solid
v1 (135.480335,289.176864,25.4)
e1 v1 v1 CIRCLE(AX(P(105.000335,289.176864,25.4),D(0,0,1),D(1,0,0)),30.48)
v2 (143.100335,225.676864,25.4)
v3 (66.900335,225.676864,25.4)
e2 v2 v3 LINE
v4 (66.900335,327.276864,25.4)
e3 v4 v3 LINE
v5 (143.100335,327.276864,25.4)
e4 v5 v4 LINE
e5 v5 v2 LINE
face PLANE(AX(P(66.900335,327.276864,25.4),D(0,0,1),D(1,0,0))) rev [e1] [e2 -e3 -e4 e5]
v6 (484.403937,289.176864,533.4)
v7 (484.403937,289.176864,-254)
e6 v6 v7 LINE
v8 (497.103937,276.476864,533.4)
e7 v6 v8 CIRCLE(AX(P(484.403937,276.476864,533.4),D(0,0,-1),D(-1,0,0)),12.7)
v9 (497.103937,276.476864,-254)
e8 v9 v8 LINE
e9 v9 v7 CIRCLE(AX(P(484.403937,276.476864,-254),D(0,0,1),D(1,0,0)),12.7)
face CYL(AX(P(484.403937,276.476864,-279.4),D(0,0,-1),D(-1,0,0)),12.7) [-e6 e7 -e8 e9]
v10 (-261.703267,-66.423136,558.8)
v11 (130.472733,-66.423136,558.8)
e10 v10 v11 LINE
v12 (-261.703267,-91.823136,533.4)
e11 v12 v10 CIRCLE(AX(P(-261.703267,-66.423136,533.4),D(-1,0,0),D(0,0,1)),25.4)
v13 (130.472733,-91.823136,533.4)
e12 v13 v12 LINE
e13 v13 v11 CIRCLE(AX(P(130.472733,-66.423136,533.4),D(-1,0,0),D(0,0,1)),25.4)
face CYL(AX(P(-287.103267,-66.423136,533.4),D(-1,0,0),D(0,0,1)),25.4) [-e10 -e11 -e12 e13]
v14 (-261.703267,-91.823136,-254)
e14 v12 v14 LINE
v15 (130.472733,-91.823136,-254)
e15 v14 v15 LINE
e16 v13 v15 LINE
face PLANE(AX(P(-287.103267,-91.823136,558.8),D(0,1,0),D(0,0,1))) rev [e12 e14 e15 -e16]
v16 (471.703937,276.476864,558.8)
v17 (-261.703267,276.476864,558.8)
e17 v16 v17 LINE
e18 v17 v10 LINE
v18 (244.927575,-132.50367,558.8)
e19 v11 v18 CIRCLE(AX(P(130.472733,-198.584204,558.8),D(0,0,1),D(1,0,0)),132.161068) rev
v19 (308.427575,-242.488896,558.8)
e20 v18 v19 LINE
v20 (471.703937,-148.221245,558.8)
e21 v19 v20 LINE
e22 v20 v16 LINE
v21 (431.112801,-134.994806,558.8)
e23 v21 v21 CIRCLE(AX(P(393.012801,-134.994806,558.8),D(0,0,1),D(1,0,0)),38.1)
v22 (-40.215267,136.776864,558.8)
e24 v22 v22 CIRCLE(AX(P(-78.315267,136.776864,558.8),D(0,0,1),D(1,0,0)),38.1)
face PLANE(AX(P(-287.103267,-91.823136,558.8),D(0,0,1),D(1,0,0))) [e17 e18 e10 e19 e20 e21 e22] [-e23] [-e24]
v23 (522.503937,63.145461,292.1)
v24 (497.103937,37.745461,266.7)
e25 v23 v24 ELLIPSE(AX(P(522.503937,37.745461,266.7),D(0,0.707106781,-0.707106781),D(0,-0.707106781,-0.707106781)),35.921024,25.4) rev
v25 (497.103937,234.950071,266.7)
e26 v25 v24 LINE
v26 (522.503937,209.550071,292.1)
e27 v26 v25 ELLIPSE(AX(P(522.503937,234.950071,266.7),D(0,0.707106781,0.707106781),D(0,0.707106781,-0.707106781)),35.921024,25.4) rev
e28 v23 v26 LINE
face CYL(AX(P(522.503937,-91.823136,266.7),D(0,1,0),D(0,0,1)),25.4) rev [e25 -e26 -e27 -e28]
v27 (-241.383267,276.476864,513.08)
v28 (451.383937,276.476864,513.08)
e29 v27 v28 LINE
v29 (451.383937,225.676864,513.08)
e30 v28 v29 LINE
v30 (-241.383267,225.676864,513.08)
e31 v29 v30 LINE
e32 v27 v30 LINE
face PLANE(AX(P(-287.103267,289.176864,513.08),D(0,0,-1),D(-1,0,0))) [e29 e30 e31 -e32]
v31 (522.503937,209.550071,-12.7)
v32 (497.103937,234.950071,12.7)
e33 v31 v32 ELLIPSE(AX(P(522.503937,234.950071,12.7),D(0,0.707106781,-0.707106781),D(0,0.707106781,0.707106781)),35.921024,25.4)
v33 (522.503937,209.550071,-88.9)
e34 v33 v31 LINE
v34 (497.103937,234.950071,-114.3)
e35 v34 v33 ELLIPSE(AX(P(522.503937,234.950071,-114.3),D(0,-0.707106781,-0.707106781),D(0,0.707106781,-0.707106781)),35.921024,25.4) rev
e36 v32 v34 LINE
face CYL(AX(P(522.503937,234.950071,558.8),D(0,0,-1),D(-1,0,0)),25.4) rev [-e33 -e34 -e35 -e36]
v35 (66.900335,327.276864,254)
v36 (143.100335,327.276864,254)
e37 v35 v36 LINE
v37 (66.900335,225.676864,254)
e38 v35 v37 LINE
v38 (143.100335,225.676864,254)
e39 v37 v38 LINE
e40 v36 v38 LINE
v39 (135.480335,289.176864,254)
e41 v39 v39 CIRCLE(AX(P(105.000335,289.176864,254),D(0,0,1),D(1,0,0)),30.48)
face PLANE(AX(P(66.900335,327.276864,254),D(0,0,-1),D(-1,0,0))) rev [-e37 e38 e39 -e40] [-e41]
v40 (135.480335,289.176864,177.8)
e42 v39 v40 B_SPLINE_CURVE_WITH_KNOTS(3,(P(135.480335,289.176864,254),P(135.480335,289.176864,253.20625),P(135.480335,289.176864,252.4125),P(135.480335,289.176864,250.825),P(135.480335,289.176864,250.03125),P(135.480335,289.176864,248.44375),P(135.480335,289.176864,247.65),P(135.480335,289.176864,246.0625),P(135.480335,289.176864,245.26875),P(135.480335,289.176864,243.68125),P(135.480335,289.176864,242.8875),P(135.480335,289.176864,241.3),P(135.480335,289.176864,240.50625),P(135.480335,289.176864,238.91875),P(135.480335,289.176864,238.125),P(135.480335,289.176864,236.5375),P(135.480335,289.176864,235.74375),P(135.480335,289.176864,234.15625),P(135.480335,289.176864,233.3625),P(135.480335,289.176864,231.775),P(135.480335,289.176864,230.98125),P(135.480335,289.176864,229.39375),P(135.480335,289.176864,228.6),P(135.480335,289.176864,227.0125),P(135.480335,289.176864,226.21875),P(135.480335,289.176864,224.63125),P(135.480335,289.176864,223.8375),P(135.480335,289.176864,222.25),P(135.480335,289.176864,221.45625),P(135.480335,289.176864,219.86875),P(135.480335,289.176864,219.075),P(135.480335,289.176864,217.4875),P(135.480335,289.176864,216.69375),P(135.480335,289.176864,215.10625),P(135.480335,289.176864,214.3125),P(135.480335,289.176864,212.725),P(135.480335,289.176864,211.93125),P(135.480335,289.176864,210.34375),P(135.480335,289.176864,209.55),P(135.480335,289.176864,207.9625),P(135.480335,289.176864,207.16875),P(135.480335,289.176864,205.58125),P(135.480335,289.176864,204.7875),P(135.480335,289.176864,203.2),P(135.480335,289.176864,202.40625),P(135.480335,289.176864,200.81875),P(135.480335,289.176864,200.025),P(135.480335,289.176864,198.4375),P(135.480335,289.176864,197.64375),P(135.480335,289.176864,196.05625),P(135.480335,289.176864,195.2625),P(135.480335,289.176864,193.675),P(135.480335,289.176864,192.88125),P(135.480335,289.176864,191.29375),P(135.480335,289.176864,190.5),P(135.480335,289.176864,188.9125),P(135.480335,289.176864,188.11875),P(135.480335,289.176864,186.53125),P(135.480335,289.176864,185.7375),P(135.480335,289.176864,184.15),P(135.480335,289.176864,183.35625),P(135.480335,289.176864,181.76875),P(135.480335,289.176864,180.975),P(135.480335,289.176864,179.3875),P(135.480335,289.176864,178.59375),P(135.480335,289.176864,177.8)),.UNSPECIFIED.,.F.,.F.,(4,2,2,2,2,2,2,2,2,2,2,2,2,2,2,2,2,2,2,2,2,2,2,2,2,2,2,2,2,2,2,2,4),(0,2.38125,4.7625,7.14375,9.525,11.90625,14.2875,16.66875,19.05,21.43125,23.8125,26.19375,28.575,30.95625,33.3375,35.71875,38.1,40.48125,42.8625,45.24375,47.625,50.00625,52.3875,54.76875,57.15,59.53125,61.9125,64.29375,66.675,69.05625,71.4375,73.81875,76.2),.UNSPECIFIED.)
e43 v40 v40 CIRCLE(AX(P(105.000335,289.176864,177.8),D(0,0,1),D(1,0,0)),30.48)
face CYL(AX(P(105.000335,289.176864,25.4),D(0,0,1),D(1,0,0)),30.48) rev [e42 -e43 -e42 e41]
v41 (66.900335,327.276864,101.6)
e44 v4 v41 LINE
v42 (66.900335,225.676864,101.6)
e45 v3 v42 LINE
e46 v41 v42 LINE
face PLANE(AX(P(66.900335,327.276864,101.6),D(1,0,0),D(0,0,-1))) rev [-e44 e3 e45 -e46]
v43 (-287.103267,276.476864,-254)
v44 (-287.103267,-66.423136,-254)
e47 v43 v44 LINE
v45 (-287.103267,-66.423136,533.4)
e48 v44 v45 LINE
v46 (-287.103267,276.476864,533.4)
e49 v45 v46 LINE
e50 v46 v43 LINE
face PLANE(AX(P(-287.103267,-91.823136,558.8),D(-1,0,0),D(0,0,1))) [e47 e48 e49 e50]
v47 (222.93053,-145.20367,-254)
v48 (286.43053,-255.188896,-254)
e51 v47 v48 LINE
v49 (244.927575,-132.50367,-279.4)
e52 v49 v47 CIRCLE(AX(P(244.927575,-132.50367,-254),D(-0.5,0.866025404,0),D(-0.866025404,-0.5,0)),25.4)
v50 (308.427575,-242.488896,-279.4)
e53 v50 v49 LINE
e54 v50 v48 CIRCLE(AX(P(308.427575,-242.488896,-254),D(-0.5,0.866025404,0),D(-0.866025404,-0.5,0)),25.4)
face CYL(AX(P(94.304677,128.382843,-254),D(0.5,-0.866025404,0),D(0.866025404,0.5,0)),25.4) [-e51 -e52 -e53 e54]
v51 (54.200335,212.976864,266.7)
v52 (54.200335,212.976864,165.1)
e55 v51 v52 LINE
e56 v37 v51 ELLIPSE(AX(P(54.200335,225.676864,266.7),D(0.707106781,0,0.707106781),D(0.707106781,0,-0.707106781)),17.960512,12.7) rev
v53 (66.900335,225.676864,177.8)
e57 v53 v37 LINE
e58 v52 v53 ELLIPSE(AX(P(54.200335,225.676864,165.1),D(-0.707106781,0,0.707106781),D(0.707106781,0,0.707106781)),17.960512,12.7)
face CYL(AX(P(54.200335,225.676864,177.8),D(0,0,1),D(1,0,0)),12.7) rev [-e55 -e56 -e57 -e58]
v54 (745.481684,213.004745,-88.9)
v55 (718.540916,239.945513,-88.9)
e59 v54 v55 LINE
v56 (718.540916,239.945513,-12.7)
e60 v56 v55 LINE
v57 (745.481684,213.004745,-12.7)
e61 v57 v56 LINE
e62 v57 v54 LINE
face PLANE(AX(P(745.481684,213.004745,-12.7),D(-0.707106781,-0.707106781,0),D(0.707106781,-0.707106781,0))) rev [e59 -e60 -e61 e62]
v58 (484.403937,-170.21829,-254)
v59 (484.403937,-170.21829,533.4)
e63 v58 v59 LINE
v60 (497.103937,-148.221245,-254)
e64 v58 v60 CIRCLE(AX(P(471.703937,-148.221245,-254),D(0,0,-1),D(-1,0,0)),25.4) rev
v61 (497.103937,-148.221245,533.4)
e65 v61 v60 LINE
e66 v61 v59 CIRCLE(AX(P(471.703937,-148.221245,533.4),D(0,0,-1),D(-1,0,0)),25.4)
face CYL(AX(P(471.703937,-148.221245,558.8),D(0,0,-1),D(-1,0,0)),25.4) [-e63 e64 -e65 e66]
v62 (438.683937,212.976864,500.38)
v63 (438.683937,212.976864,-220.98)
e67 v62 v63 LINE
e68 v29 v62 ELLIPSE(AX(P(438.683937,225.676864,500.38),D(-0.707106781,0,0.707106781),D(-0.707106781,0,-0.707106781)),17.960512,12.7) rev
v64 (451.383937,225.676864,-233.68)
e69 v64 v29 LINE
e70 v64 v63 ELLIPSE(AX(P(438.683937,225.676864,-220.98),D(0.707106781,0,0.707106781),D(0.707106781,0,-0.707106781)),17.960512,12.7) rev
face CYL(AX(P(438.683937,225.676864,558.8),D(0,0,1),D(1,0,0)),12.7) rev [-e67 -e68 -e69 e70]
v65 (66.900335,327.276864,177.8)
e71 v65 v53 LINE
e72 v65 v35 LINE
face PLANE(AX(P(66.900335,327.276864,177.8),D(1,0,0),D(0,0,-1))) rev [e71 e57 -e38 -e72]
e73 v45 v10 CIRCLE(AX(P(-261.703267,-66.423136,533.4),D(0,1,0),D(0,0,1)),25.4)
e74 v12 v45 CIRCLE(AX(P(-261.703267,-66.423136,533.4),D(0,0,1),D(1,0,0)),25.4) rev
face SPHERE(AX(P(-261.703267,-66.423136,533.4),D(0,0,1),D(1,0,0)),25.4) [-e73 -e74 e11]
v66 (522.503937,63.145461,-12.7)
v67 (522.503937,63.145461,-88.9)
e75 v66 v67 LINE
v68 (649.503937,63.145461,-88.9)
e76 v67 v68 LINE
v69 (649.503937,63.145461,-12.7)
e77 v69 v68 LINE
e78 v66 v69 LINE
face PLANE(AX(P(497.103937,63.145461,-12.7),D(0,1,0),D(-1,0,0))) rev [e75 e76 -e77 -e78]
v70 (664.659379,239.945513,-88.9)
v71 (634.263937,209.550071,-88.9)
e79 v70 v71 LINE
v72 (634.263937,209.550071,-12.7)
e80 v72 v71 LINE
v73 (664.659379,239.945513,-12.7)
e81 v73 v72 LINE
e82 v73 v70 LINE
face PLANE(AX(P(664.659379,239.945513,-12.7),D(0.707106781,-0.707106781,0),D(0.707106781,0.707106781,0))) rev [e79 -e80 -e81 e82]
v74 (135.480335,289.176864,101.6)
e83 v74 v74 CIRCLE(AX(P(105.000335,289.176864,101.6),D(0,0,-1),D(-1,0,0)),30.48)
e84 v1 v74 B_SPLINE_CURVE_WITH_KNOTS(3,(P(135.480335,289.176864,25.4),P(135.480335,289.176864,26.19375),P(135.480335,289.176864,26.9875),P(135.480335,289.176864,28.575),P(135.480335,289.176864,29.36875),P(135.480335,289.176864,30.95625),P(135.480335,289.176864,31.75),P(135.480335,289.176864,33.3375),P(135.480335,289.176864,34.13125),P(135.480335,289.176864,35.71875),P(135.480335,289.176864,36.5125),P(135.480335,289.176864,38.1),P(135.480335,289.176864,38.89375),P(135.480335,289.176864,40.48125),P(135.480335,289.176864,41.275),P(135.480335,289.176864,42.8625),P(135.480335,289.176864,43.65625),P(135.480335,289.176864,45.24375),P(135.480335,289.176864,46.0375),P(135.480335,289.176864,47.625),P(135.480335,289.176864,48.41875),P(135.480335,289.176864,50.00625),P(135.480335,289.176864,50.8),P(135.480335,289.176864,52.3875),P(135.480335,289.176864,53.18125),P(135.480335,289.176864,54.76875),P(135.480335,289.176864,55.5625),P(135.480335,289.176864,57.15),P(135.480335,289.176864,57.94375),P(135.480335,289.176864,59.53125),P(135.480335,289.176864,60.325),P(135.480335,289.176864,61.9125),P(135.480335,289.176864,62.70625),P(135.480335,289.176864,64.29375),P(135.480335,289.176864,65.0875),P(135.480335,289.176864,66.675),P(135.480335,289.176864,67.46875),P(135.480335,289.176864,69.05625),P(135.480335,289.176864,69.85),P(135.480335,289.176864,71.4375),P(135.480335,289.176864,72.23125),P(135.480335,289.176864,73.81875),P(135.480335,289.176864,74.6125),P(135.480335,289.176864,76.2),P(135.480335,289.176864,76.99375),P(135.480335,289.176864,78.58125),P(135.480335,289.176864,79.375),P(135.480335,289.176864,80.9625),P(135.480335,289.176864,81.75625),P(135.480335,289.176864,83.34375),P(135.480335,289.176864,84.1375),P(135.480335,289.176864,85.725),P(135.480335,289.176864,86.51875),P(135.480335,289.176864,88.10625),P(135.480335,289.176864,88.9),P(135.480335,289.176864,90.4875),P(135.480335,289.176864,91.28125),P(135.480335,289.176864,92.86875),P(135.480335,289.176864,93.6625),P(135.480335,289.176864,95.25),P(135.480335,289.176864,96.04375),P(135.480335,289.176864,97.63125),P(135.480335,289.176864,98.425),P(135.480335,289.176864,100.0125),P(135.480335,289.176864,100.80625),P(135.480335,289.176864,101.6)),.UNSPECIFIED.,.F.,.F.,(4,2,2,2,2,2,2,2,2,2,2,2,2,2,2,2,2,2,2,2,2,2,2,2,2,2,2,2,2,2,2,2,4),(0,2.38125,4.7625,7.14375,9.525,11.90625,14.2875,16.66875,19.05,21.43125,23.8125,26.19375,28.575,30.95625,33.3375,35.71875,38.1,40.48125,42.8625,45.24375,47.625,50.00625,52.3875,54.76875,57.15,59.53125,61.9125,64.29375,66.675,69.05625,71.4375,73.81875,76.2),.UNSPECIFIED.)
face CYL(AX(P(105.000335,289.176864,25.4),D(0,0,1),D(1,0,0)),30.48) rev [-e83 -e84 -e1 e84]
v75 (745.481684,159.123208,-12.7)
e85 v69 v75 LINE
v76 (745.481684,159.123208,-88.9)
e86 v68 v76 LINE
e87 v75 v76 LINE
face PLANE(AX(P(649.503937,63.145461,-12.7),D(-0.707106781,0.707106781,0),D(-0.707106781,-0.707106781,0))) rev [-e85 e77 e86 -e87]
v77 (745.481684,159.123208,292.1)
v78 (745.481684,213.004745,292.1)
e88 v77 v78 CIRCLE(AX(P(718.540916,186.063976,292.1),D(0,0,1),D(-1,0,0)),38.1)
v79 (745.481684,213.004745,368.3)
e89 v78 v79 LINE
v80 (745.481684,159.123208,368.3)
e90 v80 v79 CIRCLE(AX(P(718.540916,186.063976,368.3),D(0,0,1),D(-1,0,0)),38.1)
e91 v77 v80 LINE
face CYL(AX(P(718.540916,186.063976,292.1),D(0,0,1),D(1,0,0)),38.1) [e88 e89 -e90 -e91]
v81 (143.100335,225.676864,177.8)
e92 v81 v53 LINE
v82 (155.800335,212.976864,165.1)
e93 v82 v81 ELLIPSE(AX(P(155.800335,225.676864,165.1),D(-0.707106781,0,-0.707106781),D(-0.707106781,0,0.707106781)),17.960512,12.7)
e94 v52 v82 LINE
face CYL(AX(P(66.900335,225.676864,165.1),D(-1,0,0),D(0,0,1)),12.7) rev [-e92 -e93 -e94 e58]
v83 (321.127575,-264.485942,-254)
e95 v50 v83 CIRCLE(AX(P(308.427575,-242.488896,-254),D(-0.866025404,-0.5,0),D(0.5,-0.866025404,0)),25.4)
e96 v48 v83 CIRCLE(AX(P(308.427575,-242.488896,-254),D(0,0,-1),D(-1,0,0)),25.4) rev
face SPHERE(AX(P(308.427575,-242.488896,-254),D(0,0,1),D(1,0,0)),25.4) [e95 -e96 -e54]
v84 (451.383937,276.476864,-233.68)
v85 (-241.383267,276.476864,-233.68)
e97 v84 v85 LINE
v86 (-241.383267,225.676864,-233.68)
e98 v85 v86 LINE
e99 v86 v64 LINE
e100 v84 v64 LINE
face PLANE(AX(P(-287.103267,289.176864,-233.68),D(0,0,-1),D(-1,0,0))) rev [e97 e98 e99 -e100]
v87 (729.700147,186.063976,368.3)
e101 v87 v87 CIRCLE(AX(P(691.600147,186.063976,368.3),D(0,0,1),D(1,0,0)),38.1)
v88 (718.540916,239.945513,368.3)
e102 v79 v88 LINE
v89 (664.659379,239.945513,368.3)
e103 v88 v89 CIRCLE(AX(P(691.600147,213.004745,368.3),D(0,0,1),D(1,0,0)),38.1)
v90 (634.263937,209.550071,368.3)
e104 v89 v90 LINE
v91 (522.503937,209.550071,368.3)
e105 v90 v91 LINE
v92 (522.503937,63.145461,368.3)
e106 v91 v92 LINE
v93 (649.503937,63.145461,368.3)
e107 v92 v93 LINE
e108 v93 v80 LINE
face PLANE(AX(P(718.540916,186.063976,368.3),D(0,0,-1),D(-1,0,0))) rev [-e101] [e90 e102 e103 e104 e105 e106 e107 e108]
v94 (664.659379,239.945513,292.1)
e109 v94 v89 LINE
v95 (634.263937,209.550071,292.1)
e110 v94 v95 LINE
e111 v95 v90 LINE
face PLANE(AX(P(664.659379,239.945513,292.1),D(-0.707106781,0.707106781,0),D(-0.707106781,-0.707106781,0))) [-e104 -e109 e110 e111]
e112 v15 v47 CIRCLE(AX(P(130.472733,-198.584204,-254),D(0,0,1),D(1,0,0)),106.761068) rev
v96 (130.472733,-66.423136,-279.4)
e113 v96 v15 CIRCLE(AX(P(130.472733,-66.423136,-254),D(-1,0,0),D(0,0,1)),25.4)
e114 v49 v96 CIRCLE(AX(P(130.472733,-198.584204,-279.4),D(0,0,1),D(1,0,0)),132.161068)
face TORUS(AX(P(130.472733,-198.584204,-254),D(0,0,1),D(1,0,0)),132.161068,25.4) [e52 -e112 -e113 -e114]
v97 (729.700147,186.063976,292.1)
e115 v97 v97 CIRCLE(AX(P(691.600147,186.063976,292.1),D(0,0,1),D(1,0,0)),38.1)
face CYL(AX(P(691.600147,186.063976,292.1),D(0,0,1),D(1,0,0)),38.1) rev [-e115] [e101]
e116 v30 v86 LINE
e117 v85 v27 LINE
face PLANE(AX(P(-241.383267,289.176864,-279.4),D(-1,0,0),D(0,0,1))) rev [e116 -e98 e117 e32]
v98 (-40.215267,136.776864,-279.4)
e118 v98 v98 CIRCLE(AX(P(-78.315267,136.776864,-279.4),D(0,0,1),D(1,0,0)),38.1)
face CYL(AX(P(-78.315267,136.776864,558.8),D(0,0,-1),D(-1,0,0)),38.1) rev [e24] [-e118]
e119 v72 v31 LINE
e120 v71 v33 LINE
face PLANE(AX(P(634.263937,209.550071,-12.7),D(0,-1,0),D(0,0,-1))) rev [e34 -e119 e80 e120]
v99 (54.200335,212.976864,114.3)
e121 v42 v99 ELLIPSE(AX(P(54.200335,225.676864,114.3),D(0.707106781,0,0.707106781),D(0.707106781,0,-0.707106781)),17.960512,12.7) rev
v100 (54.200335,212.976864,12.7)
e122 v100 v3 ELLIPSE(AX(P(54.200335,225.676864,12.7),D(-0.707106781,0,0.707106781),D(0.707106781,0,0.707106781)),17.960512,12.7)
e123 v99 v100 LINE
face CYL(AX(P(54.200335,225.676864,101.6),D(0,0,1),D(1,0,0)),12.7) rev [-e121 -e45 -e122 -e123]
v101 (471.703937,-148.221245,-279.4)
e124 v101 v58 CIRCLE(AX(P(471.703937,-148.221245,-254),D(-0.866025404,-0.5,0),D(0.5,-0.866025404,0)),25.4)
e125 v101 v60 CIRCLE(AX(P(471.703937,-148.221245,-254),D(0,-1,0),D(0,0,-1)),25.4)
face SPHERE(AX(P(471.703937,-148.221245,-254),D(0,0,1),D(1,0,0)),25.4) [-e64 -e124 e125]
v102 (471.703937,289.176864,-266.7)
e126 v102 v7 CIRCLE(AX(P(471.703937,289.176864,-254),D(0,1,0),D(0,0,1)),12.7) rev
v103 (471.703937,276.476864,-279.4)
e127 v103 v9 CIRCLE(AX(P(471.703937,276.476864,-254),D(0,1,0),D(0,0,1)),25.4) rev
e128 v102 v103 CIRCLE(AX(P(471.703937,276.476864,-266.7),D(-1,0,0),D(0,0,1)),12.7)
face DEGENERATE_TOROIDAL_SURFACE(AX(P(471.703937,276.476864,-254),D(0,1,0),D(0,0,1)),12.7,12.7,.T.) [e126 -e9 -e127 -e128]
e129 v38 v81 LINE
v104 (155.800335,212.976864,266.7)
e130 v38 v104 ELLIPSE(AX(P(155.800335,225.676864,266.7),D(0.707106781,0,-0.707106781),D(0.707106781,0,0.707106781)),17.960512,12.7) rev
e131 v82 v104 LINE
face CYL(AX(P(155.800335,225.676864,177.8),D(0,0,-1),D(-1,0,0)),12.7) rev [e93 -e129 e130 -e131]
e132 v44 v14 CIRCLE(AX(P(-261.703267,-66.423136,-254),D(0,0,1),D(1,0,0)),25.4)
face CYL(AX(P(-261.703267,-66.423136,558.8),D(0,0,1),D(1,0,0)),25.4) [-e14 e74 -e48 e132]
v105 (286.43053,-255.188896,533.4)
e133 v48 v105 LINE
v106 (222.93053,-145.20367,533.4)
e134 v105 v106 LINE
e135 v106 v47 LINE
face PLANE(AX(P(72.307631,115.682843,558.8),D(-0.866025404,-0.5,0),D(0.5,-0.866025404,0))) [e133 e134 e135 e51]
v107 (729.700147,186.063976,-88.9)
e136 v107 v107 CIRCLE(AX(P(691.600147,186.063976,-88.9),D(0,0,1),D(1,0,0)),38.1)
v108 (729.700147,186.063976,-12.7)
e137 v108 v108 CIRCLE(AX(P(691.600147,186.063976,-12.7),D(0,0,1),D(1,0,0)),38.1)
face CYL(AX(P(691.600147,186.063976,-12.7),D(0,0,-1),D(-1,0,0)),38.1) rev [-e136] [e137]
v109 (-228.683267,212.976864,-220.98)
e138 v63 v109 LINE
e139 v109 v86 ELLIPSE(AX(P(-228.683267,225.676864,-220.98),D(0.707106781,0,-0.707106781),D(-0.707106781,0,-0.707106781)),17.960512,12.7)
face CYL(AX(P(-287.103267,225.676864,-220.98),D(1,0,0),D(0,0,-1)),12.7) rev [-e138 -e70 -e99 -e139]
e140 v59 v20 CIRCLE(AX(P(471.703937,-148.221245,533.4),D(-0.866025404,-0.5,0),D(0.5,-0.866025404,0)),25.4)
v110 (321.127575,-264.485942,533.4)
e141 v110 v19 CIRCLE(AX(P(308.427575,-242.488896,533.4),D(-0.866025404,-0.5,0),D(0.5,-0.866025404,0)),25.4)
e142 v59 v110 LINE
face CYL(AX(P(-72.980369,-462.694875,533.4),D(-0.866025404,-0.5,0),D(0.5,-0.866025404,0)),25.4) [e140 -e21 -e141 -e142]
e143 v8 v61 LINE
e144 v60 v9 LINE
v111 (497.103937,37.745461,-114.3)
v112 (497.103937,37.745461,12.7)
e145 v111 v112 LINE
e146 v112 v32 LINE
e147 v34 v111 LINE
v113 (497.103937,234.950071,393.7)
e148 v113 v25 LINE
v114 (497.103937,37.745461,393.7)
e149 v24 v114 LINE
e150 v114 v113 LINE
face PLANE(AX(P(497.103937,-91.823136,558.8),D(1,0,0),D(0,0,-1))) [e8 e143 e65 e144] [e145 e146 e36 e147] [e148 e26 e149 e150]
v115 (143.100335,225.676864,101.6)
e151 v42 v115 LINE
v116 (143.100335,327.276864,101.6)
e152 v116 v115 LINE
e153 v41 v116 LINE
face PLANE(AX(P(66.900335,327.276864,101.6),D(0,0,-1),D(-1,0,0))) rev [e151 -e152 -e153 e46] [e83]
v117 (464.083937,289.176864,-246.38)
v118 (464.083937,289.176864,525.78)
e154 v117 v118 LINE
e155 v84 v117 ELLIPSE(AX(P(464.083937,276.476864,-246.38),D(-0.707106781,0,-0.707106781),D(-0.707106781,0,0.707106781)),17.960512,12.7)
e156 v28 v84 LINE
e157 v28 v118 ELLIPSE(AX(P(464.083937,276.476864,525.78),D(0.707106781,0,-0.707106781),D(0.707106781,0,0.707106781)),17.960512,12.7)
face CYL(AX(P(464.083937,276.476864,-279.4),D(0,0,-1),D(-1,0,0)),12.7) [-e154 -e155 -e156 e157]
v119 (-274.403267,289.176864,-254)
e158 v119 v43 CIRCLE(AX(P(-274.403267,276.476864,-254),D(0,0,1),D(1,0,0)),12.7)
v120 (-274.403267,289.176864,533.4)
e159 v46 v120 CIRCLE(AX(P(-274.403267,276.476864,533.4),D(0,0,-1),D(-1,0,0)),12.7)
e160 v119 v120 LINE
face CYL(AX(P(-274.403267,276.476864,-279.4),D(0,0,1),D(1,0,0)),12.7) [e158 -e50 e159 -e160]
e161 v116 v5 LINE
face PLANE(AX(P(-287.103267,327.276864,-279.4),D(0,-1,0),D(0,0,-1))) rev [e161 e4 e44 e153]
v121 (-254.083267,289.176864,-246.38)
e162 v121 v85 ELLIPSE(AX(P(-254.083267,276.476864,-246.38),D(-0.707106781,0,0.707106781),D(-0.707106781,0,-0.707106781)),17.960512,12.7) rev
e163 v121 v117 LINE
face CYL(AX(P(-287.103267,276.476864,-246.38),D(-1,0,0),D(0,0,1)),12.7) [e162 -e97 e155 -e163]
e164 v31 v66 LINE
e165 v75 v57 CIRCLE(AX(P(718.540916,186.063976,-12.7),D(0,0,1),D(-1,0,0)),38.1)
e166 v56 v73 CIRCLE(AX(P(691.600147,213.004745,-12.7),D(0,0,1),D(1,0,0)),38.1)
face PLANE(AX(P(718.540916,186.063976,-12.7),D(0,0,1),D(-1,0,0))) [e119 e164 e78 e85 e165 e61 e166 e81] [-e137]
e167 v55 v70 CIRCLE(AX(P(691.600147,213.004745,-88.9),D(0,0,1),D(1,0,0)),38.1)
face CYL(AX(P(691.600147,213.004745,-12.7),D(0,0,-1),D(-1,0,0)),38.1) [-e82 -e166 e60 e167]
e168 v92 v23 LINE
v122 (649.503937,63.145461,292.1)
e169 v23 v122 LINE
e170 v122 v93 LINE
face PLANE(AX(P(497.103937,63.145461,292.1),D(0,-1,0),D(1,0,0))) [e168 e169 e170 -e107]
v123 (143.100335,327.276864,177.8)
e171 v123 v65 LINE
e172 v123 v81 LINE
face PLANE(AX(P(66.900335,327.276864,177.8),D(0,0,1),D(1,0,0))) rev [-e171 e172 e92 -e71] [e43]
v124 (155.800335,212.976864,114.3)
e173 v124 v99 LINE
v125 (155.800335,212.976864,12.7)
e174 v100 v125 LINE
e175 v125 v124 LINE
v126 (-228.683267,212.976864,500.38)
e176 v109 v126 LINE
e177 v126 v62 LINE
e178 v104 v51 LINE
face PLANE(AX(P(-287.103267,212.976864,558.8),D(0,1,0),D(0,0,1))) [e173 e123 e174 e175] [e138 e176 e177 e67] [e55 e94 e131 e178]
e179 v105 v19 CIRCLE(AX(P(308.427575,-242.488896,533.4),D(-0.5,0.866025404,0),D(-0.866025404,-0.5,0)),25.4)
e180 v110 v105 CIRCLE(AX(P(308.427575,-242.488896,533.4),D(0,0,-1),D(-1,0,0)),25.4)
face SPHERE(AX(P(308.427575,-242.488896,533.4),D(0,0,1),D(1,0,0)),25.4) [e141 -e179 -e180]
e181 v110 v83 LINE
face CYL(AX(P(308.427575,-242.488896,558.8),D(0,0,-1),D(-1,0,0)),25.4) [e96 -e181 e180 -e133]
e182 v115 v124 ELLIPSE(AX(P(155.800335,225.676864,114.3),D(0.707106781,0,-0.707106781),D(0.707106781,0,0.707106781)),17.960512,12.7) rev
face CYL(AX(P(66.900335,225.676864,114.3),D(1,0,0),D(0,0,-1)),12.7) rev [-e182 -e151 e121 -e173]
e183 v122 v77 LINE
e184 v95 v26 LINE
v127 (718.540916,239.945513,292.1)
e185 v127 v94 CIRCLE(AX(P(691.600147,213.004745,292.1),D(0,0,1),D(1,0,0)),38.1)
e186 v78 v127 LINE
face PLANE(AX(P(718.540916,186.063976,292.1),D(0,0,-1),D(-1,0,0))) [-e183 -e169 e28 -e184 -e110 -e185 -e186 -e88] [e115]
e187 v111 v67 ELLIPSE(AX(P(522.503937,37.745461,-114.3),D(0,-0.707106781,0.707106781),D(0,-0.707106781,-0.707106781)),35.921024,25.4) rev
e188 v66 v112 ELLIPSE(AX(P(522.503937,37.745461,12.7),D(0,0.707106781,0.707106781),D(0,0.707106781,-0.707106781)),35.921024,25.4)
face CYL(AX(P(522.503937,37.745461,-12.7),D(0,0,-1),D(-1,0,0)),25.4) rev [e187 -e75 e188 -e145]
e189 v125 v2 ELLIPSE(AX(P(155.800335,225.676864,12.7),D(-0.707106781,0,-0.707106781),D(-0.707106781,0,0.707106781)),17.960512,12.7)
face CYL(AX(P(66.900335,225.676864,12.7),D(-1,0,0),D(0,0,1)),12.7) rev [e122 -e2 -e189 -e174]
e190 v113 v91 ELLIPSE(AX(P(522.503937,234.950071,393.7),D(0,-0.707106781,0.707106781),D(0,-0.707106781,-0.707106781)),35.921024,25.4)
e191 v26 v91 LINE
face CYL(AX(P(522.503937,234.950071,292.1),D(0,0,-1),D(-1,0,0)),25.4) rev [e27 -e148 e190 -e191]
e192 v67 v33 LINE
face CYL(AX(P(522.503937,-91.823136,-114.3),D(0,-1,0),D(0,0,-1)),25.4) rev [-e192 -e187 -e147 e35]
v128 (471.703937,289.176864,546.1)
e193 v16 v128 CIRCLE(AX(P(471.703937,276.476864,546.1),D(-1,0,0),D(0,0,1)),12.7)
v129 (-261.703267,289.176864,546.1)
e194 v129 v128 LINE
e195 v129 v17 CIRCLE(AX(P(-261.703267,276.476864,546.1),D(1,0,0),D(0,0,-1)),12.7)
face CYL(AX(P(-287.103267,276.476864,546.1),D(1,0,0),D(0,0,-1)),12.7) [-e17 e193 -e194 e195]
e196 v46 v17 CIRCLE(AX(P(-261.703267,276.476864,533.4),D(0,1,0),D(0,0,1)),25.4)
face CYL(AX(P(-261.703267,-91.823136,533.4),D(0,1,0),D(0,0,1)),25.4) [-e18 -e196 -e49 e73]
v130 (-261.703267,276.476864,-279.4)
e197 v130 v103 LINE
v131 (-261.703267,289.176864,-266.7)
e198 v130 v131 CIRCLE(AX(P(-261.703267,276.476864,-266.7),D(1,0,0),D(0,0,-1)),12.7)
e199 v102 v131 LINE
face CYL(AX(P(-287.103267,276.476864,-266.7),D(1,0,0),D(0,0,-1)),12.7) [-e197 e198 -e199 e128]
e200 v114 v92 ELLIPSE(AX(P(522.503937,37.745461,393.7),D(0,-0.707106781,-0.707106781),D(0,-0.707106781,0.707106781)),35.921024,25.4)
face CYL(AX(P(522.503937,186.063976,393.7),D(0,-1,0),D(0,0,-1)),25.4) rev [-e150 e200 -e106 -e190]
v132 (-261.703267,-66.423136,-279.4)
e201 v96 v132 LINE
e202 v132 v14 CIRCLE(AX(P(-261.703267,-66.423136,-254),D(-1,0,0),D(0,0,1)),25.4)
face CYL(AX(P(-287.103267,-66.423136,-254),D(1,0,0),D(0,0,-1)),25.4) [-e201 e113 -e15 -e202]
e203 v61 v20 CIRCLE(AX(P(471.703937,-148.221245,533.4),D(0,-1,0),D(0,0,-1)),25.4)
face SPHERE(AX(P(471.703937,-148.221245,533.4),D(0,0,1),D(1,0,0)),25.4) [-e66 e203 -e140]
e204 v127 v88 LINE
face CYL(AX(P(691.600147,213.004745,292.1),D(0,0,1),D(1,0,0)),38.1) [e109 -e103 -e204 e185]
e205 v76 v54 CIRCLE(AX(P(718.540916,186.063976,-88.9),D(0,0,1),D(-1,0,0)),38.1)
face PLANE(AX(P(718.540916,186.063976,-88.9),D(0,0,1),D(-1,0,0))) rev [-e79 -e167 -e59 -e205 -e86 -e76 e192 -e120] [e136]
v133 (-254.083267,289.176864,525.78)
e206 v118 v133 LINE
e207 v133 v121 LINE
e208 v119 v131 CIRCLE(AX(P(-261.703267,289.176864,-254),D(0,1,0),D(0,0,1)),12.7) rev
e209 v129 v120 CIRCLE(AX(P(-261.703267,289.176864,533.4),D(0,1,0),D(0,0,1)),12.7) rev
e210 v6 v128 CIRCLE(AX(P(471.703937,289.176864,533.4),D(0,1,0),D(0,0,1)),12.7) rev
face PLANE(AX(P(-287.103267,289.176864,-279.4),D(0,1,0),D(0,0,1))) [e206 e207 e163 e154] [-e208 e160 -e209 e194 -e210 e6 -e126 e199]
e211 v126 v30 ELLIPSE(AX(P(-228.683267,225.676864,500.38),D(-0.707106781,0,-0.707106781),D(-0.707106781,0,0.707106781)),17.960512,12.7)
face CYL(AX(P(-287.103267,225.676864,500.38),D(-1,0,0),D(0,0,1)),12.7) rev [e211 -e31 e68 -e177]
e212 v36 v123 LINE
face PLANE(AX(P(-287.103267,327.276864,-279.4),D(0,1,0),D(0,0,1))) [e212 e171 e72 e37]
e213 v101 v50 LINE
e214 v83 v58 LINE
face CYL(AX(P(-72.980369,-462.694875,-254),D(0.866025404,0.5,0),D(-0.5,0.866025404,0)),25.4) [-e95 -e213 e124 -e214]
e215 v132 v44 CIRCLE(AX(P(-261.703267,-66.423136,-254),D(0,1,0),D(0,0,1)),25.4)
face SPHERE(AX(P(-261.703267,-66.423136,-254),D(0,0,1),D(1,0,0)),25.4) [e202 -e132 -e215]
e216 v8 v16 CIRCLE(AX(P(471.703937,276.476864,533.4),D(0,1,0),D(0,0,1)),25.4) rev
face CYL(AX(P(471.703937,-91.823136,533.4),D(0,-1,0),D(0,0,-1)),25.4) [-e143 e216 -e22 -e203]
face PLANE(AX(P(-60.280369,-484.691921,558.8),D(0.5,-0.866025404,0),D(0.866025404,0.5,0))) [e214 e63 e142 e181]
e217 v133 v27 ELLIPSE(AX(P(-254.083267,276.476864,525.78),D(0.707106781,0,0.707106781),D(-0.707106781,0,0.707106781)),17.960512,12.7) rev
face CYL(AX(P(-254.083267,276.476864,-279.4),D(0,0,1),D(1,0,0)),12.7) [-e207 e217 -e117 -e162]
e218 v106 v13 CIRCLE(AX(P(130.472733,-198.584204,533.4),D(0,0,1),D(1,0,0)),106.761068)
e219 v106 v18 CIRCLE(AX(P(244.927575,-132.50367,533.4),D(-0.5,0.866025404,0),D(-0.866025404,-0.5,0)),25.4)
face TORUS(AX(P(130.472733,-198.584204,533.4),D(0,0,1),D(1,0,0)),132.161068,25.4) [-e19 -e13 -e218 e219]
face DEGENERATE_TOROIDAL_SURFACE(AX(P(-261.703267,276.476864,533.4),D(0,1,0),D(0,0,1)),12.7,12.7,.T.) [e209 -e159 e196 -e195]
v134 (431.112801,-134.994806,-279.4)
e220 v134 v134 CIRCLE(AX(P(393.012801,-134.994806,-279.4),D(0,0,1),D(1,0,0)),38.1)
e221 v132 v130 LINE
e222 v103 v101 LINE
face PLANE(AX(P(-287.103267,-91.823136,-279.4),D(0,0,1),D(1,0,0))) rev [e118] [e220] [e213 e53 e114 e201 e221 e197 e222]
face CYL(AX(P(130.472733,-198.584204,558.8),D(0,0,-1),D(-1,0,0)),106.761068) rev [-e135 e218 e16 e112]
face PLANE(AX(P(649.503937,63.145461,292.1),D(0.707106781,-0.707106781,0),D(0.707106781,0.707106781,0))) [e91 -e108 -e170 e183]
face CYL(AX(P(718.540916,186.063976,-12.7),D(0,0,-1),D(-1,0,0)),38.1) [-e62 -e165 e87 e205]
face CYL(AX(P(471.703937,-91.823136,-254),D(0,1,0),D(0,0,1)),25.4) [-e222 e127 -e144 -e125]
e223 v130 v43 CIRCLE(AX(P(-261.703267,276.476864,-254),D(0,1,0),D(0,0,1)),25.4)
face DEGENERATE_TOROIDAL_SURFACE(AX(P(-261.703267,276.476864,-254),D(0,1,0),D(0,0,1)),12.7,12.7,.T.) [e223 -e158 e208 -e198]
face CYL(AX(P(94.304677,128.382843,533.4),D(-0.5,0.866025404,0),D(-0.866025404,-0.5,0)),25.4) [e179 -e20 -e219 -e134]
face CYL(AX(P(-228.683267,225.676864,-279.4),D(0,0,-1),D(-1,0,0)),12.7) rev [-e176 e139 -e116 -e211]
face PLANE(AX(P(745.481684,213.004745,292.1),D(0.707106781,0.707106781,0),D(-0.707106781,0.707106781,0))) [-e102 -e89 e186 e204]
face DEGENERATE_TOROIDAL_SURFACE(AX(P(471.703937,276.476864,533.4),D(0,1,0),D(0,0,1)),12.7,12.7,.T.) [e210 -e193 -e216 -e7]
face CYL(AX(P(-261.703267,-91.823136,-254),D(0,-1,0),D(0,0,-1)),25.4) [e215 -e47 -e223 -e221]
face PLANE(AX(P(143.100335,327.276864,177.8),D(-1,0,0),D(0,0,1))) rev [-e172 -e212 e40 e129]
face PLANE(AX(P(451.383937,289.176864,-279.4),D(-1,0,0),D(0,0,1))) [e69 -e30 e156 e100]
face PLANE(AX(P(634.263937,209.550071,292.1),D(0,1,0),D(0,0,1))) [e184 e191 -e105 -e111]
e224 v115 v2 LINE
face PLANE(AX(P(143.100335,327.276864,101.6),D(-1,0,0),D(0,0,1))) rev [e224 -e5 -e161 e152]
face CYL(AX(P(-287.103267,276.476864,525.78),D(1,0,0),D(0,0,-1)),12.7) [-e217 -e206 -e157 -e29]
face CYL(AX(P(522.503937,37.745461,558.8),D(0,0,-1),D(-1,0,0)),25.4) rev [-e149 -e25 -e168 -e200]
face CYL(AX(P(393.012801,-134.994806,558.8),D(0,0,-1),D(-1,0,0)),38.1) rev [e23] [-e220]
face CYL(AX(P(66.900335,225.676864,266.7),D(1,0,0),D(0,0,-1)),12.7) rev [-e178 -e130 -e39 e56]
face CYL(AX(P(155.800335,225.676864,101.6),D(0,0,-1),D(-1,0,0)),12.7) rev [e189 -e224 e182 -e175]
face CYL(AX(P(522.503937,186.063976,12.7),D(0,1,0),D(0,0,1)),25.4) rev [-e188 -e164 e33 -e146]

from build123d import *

# Parameters (mm, degrees)
SKETCH2_W           = 139.192
SKETCH2_H           = 101.6
SKETCH2_R           = 12.7
BOSS_EXTRUDE1_DEPTH = 279.4
SKETCH4_W           = 261.402401422
SKETCH4_H           = 279.4
SKETCH4_W_2         = 230.922401422
SKETCH4_H_2         = 248.92
BOSS_EXTRUDE2_DEPTH = 25.4
BOSS_EXTRUDE3_START = -63.5
SKETCH5_R           = 12.7
BOSS_EXTRUDE3_DEPTH = 25.4
SKETCH6_W           = 25.4
SKETCH6_H           = 25.4
BOSS_EXTRUDE4_DEPTH = 38.1
SKETCH7_R           = 10.16
CUT_EXTRUDE1_DEPTH  = 76.2
SCALE1_SCALE        = 3
FILLET1_R           = 12.7
FILLET2_R           = 25.4
FILLET3_R           = 25.4
FILLET5_R           = 25.4


with BuildPart() as part:
    # Sketch2 → Boss-Extrude1 (new body)
    # profile 1 of 3: a face of its own
    with BuildSketch(Plane.XY):
        with Locations((69.596, 50.8)):
            Rectangle(SKETCH2_W, SKETCH2_H)
        with Locations((69.596, 76.2)):
            Circle(SKETCH2_R, mode=Mode.SUBTRACT)
    # profile 2 of 3: a face of its own
    with BuildSketch(Plane.XY):
        with BuildLine():
            Line((139.192, 101.6), (139.192, 0))
            ThreePointArc((139.192, 0), (156.985511322, -4.767756989), (170.011265654, -17.793511322))
            Line((170.011265654, -17.793511322), (236.002401422, 20.306488678))
            Line((236.002401422, 20.306488678), (261.402401422, -23.687601834))
            Line((261.402401422, -23.687601834), (261.402401422, 101.6))
            Line((261.402401422, 101.6), (139.192, 101.6))
        make_face()
    # profile 3 of 3: a face of its own
    with BuildSketch(Plane.XY):
        Polygon((195.411265654, -61.787601834), (170.011265654, -17.793511322), (236.002401422, 20.306488678), (261.402401422, -23.687601834), align=None)
        with Locations((226.705356166, -14.390556578)):
            Circle(SKETCH2_R, mode=Mode.SUBTRACT)
    extrude(amount=BOSS_EXTRUDE1_DEPTH)

    # Sketch4 → Boss-Extrude2 (add)
    with BuildSketch(Plane(origin=(0, 101.6, 0), x_dir=(1, 0, 0), z_dir=(0, 1, 0))):
        with Locations((130.701200711, -139.7)):
            Rectangle(SKETCH4_W, SKETCH4_H)
        with Locations((130.701200711, -139.7)):
            Rectangle(SKETCH4_W_2, SKETCH4_H_2, mode=Mode.SUBTRACT)
    extrude(amount=BOSS_EXTRUDE2_DEPTH)

    # Sketch5 → Boss-Extrude3 (add)
    with BuildSketch(Plane.XY.offset(279.4).offset(BOSS_EXTRUDE3_START)):
        with BuildLine():
            Line((261.402401422, 51.656199083), (312.202401422, 51.656199083))
            Line((312.202401422, 51.656199083), (344.194983673, 83.648781334))
            ThreePointArc((344.194983673, 83.648781334), (347.914727552, 92.629037455), (344.194983673, 101.609293576))
            Line((344.194983673, 101.609293576), (335.214727552, 110.589549697))
            ThreePointArc((335.214727552, 110.589549697), (326.234471431, 114.309293576), (317.254215309, 110.589549697))
            Line((317.254215309, 110.589549697), (307.122401422, 100.45773581))
            Line((307.122401422, 100.45773581), (261.402401422, 100.45773581))
            Line((261.402401422, 100.45773581), (261.402401422, 51.656199083))
        make_face()
        with Locations((326.234471431, 92.629037455)):
            Circle(SKETCH5_R, mode=Mode.SUBTRACT)
    boss_extrude3 = extrude(amount=-BOSS_EXTRUDE3_DEPTH)

    # Mirror1: Boss-Extrude3 across plane
    add(boss_extrude3.mirror(Plane.XY.offset(139.7)))

    # Sketch6 → Boss-Extrude4 (add)
    with BuildSketch(Plane(origin=(0, 101.6, 0), x_dir=(1, 0, 0), z_dir=(0, 1, 0))):
        with Locations((130.701200711, -114.3)):
            Rectangle(SKETCH6_W, SKETCH6_H)
        with Locations((130.701200711, -165.1)):
            Rectangle(SKETCH6_W, SKETCH6_H)
    extrude(amount=BOSS_EXTRUDE4_DEPTH)

    # Sketch7 → Cut-Extrude1 (cut)
    with BuildSketch(Plane.XY.offset(177.8)):
        with Locations((130.701200711, 127)):
            Circle(SKETCH7_R)
    extrude(amount=-CUT_EXTRUDE1_DEPTH, mode=Mode.SUBTRACT)


with BuildPart() as part_1:
    # Scale1: scaled about (143.551633531, 45.911568098, 139.7)
    add(part.part.scale(SCALE1_SCALE).moved(Location((-287.103267062, -91.823136196, -279.4))))

    # Fillet1
    fillet1_edges = [part_1.edges().sort_by_distance(p)[0] for p in [
        (66.900335071, 212.976863804, 63.5),
        (105.000335071, 212.976863804, 101.6),
        (143.100335071, 212.976863804, 63.5),
        (105.000335071, 212.976863804, 25.4),
        (66.900335071, 212.976863804, 215.9),
        (105.000335071, 212.976863804, 254),
        (143.100335071, 212.976863804, 215.9),
        (105.000335071, 212.976863804, 177.8),
        (451.383937205, 289.176863804, 139.7),
        (105.000335071, 289.176863804, 513.08),
        (-241.383267062, 212.976863804, 139.7),
        (105.000335071, 212.976863804, -233.68),
        (-241.383267062, 289.176863804, 139.7),
        (105.000335071, 289.176863804, -233.68),
        (497.103937205, 289.176863804, 139.7),
        (105.000335071, 289.176863804, -279.4),
        (-287.103267062, 289.176863804, 139.7),
        (105.000335071, 289.176863804, 558.8),
        (451.383937205, 212.976863804, 139.7),
        (105.000335071, 212.976863804, 513.08),
    ]]
    fillet(fillet1_edges, radius=FILLET1_R)

    # Fillet2
    fillet2_edges = [part_1.edges().sort_by_distance(p)[0] for p in [
        (-287.103267062, -91.823136196, 139.7),
        (497.103937205, -162.885941697, 139.7),
        (299.1305299, -277.185941697, 139.7),
    ]]
    fillet(fillet2_edges, radius=FILLET2_R)

    # Fillet3
    # the kernel refuses this fillet: 25.4 mm, written as the material it takes off along each edge
    with BuildSketch(Plane(origin=(-261.703267062, 289.176863804, -254), x_dir=(0, 0, -1), z_dir=(1, 0, 0))) as fillet3_piece_1:
        with BuildLine():
            CenterArc((12.7, -12.7), 12.7, 0, 90)
            Line((25.4, -12.7), (25.4, 0))
            Line((25.4, 0), (12.7, 0))
        make_face()
    revolve(axis=Axis((-261.703267062, 289.176863804, -254), (0, 1, 0)), revolution_arc=90, mode=Mode.SUBTRACT)
    with BuildSketch(Plane(origin=(471.703937205, 289.176863804, -254), x_dir=(1, 0, 0), z_dir=(0, 0, 1))) as fillet3_piece_2:
        with BuildLine():
            CenterArc((12.7, -12.7), 12.7, 0, 90)
            Line((25.4, -12.7), (25.4, 0))
            Line((25.4, 0), (12.7, 0))
        make_face()
    revolve(axis=Axis((471.703937205, 289.176863804, -254), (0, 1, 0)), revolution_arc=90, mode=Mode.SUBTRACT)
    with BuildSketch(Plane(origin=(-261.703267062, 289.176863804, 533.4), x_dir=(-1, 0, 0), z_dir=(0, 0, -1))) as fillet3_piece_3:
        with BuildLine():
            CenterArc((12.7, -12.7), 12.7, 0, 90)
            Line((25.4, -12.7), (25.4, 0))
            Line((25.4, 0), (12.7, 0))
        make_face()
    revolve(axis=Axis((-261.703267062, 289.176863804, 533.4), (0, 1, 0)), revolution_arc=90, mode=Mode.SUBTRACT)
    with BuildSketch(Plane(origin=(471.703937205, 289.176863804, 533.4), x_dir=(0, 0, 1), z_dir=(-1, 0, 0))) as fillet3_piece_4:
        with BuildLine():
            CenterArc((12.7, -12.7), 12.7, 0, 90)
            Line((25.4, -12.7), (25.4, 0))
            Line((25.4, 0), (12.7, 0))
        make_face()
    revolve(axis=Axis((471.703937205, 289.176863804, 533.4), (0, 1, 0)), revolution_arc=90, mode=Mode.SUBTRACT)
    with BuildSketch(Plane(origin=(497.103937205, -148.22124486, 558.8), x_dir=(-1, 0, 0), z_dir=(0, 1, 0)), Plane(origin=(497.103937205, 289.176863804, -279.4), x_dir=(-1, 0, 0), z_dir=(0, -1, 0))) as fillet3_piece_5:
        with BuildLine():
            CenterArc((FILLET3_R, -FILLET3_R), FILLET3_R, 90, 90)
            Line((0, -FILLET3_R), (0, 0))
            Line((0, 0), (FILLET3_R, 0))
        make_face()
    extrude(amount=437.398108664, mode=Mode.SUBTRACT)
    with BuildSketch(Plane(origin=(130.472732938, -198.584204125, -279.4), x_dir=(0, 1, 0), z_dir=(-1, 0, 0))) as fillet3_piece_6:
        with BuildLine():
            CenterArc((106.761067929 + FILLET3_R, -FILLET3_R), FILLET3_R, 90, 90)
            Line((106.761067929, -FILLET3_R), (106.761067929, 0))
            Line((106.761067929, 0), (106.761067929 + FILLET3_R, 0))
        make_face()
    revolve(axis=Axis((130.472732938, -198.584204125, -279.4), (0, 0, -1)), revolution_arc=60, mode=Mode.SUBTRACT)
    with BuildSketch(Plane(origin=(130.472732938, -198.584204125, 558.8), x_dir=(0, 1, 0), z_dir=(-1, 0, 0))) as fillet3_piece_7:
        with BuildLine():
            CenterArc((106.761067929 + FILLET3_R, FILLET3_R), FILLET3_R, 180, 90)
            Line((106.761067929, FILLET3_R), (106.761067929, 0))
            Line((106.761067929, 0), (106.761067929 + FILLET3_R, 0))
        make_face()
    revolve(axis=Axis((130.472732938, -198.584204125, 558.8), (0, 0, -1)), revolution_arc=60, mode=Mode.SUBTRACT)
    with BuildSketch(Plane(origin=(-287.103267062, 289.176863804, -279.4), x_dir=(0, 0, 1), z_dir=(0, -1, 0)), Plane(origin=(-287.103267062, -66.423136196, 558.8), x_dir=(0, 0, -1), z_dir=(0, 1, 0))) as fillet3_piece_8:
        with BuildLine():
            CenterArc((FILLET3_R, -FILLET3_R), FILLET3_R, 90, 90)
            Line((0, -FILLET3_R), (0, 0))
            Line((0, 0), (FILLET3_R, 0))
        make_face()
    extrude(amount=355.6, mode=Mode.SUBTRACT)
    with BuildSketch(Plane(origin=(484.403937205, -170.218290116, -279.4), x_dir=(-0.5000000000000038, 0.8660254037844364, 0), z_dir=(-0.8660254037844365, -0.5000000000000038, 0))) as fillet3_piece_9:
        with BuildLine():
            CenterArc((FILLET3_R, -FILLET3_R), FILLET3_R, 90, 90)
            Line((0, -FILLET3_R), (0, 0))
            Line((0, 0), (FILLET3_R, 0))
        make_face()
    extrude(amount=188.535303163, mode=Mode.SUBTRACT)
    with BuildSketch(Plane(origin=(286.4305299, -255.188896441, -279.4), x_dir=(0.8660254037844366, 0.5000000000000034, 0), z_dir=(-0.5000000000000036, 0.8660254037844367, 0))) as fillet3_piece_10:
        with BuildLine():
            CenterArc((FILLET3_R, -FILLET3_R), FILLET3_R, 90, 90)
            Line((0, -FILLET3_R), (0, 0))
            Line((0, 0), (FILLET3_R, 0))
        make_face()
    extrude(amount=127, mode=Mode.SUBTRACT)
    with BuildSketch(Plane(origin=(130.472732938, -91.823136196, -279.4), x_dir=(0, 1, 0), z_dir=(-1, 0, 0))) as fillet3_piece_11:
        with BuildLine():
            CenterArc((FILLET3_R, -FILLET3_R), FILLET3_R, 90, 90)
            Line((0, -FILLET3_R), (0, 0))
            Line((0, 0), (FILLET3_R, 0))
        make_face()
    extrude(amount=392.176, mode=Mode.SUBTRACT)
    with BuildSketch(Plane(origin=(-261.703267062, -66.423136196, -279.4), x_dir=(-1, 0, 0), z_dir=(0, 1, 0))) as fillet3_piece_12:
        with BuildLine():
            CenterArc((25.4 - FILLET3_R, FILLET3_R), FILLET3_R, 270, 90)
            Line((25.4 - FILLET3_R, 0), (25.4, 0))
            Line((25.4, 0), (25.4, FILLET3_R))
        make_face()
    revolve(axis=Axis((-261.703267062, -66.423136196, -279.4), (0, 0, 1)), revolution_arc=90, mode=Mode.SUBTRACT)
    with BuildSketch(Plane(origin=(308.427575156, -242.488896441, -279.4), x_dir=(0.5000000000000039, -0.8660254037844364, 0), z_dir=(0.8660254037844364, 0.5000000000000039, 0))) as fillet3_piece_13:
        with BuildLine():
            CenterArc((25.4 - FILLET3_R, -FILLET3_R), FILLET3_R, 0, 90)
            Line((25.4, -FILLET3_R), (25.4, 0))
            Line((25.4, 0), (25.4 - FILLET3_R, 0))
        make_face()
    revolve(axis=Axis((308.427575156, -242.488896441, -279.4), (0, 0, -1)), revolution_arc=90, mode=Mode.SUBTRACT)
    with BuildSketch(Plane(origin=(471.703937205, -148.22124486, -279.4), x_dir=(1, 0, 0), z_dir=(0, 1, 0))) as fillet3_piece_14:
        with BuildLine():
            CenterArc((25.4 - FILLET3_R, -FILLET3_R), FILLET3_R, 0, 90)
            Line((25.4, -FILLET3_R), (25.4, 0))
            Line((25.4, 0), (25.4 - FILLET3_R, 0))
        make_face()
    revolve(axis=Axis((471.703937205, -148.22124486, -279.4), (0, 0, -1)), revolution_arc=60, mode=Mode.SUBTRACT)
    with BuildSketch(Plane(origin=(484.403937205, -170.218290116, 558.8), x_dir=(-0.5000000000000038, 0.8660254037844364, 0), z_dir=(-0.8660254037844365, -0.5000000000000038, 0))) as fillet3_piece_15:
        with BuildLine():
            CenterArc((FILLET3_R, FILLET3_R), FILLET3_R, 180, 90)
            Line((0, FILLET3_R), (0, 0))
            Line((0, 0), (FILLET3_R, 0))
        make_face()
    extrude(amount=188.535303163, mode=Mode.SUBTRACT)
    with BuildSketch(Plane(origin=(130.472732938, -91.823136196, 558.8), x_dir=(0, 1, 0), z_dir=(-1, 0, 0))) as fillet3_piece_16:
        with BuildLine():
            CenterArc((FILLET3_R, FILLET3_R), FILLET3_R, 180, 90)
            Line((0, FILLET3_R), (0, 0))
            Line((0, 0), (FILLET3_R, 0))
        make_face()
    extrude(amount=392.176, mode=Mode.SUBTRACT)
    with BuildSketch(Plane(origin=(286.4305299, -255.188896441, 558.8), x_dir=(0.8660254037844366, 0.5000000000000034, 0), z_dir=(-0.5000000000000036, 0.8660254037844367, 0))) as fillet3_piece_17:
        with BuildLine():
            CenterArc((FILLET3_R, FILLET3_R), FILLET3_R, 180, 90)
            Line((0, FILLET3_R), (0, 0))
            Line((0, 0), (FILLET3_R, 0))
        make_face()
    extrude(amount=127, mode=Mode.SUBTRACT)
    with BuildSketch(Plane(origin=(-261.703267062, -66.423136196, 558.8), x_dir=(-1, 0, 0), z_dir=(0, 1, 0))) as fillet3_piece_18:
        with BuildLine():
            CenterArc((25.4 - FILLET3_R, -FILLET3_R), FILLET3_R, 0, 90)
            Line((25.4, -FILLET3_R), (25.4, 0))
            Line((25.4, 0), (25.4 - FILLET3_R, 0))
        make_face()
    revolve(axis=Axis((-261.703267062, -66.423136196, 558.8), (0, 0, 1)), revolution_arc=90, mode=Mode.SUBTRACT)
    with BuildSketch(Plane(origin=(308.427575156, -242.488896441, 558.8), x_dir=(0.5000000000000039, -0.8660254037844364, 0), z_dir=(0.8660254037844364, 0.5000000000000039, 0))) as fillet3_piece_19:
        with BuildLine():
            CenterArc((25.4 - FILLET3_R, FILLET3_R), FILLET3_R, 270, 90)
            Line((25.4, FILLET3_R), (25.4, 0))
            Line((25.4, 0), (25.4 - FILLET3_R, 0))
        make_face()
    revolve(axis=Axis((308.427575156, -242.488896441, 558.8), (0, 0, -1)), revolution_arc=90, mode=Mode.SUBTRACT)
    with BuildSketch(Plane(origin=(471.703937205, -148.22124486, 558.8), x_dir=(1, 0, 0), z_dir=(0, 1, 0))) as fillet3_piece_20:
        with BuildLine():
            CenterArc((25.4 - FILLET3_R, FILLET3_R), FILLET3_R, 270, 90)
            Line((25.4, FILLET3_R), (25.4, 0))
            Line((25.4, 0), (25.4 - FILLET3_R, 0))
        make_face()
    revolve(axis=Axis((471.703937205, -148.22124486, 558.8), (0, 0, -1)), revolution_arc=60, mode=Mode.SUBTRACT)

    # Fillet5
    fillet5_edges = [part_1.edges().sort_by_distance(p)[0] for p in [
        (497.103937205, 136.347766143, 292.1),
        (497.103937205, 63.145461053, 330.2),
        (497.103937205, 209.550071233, 330.2),
        (497.103937205, 136.347766143, 368.3),
        (497.103937205, 136.347766143, -12.7),
        (497.103937205, 136.347766143, -88.9),
        (497.103937205, 209.550071233, -50.8),
        (497.103937205, 63.145461053, -50.8),
    ]]
    fillet(fillet5_edges, radius=FILLET5_R)


solid = part_1.part
